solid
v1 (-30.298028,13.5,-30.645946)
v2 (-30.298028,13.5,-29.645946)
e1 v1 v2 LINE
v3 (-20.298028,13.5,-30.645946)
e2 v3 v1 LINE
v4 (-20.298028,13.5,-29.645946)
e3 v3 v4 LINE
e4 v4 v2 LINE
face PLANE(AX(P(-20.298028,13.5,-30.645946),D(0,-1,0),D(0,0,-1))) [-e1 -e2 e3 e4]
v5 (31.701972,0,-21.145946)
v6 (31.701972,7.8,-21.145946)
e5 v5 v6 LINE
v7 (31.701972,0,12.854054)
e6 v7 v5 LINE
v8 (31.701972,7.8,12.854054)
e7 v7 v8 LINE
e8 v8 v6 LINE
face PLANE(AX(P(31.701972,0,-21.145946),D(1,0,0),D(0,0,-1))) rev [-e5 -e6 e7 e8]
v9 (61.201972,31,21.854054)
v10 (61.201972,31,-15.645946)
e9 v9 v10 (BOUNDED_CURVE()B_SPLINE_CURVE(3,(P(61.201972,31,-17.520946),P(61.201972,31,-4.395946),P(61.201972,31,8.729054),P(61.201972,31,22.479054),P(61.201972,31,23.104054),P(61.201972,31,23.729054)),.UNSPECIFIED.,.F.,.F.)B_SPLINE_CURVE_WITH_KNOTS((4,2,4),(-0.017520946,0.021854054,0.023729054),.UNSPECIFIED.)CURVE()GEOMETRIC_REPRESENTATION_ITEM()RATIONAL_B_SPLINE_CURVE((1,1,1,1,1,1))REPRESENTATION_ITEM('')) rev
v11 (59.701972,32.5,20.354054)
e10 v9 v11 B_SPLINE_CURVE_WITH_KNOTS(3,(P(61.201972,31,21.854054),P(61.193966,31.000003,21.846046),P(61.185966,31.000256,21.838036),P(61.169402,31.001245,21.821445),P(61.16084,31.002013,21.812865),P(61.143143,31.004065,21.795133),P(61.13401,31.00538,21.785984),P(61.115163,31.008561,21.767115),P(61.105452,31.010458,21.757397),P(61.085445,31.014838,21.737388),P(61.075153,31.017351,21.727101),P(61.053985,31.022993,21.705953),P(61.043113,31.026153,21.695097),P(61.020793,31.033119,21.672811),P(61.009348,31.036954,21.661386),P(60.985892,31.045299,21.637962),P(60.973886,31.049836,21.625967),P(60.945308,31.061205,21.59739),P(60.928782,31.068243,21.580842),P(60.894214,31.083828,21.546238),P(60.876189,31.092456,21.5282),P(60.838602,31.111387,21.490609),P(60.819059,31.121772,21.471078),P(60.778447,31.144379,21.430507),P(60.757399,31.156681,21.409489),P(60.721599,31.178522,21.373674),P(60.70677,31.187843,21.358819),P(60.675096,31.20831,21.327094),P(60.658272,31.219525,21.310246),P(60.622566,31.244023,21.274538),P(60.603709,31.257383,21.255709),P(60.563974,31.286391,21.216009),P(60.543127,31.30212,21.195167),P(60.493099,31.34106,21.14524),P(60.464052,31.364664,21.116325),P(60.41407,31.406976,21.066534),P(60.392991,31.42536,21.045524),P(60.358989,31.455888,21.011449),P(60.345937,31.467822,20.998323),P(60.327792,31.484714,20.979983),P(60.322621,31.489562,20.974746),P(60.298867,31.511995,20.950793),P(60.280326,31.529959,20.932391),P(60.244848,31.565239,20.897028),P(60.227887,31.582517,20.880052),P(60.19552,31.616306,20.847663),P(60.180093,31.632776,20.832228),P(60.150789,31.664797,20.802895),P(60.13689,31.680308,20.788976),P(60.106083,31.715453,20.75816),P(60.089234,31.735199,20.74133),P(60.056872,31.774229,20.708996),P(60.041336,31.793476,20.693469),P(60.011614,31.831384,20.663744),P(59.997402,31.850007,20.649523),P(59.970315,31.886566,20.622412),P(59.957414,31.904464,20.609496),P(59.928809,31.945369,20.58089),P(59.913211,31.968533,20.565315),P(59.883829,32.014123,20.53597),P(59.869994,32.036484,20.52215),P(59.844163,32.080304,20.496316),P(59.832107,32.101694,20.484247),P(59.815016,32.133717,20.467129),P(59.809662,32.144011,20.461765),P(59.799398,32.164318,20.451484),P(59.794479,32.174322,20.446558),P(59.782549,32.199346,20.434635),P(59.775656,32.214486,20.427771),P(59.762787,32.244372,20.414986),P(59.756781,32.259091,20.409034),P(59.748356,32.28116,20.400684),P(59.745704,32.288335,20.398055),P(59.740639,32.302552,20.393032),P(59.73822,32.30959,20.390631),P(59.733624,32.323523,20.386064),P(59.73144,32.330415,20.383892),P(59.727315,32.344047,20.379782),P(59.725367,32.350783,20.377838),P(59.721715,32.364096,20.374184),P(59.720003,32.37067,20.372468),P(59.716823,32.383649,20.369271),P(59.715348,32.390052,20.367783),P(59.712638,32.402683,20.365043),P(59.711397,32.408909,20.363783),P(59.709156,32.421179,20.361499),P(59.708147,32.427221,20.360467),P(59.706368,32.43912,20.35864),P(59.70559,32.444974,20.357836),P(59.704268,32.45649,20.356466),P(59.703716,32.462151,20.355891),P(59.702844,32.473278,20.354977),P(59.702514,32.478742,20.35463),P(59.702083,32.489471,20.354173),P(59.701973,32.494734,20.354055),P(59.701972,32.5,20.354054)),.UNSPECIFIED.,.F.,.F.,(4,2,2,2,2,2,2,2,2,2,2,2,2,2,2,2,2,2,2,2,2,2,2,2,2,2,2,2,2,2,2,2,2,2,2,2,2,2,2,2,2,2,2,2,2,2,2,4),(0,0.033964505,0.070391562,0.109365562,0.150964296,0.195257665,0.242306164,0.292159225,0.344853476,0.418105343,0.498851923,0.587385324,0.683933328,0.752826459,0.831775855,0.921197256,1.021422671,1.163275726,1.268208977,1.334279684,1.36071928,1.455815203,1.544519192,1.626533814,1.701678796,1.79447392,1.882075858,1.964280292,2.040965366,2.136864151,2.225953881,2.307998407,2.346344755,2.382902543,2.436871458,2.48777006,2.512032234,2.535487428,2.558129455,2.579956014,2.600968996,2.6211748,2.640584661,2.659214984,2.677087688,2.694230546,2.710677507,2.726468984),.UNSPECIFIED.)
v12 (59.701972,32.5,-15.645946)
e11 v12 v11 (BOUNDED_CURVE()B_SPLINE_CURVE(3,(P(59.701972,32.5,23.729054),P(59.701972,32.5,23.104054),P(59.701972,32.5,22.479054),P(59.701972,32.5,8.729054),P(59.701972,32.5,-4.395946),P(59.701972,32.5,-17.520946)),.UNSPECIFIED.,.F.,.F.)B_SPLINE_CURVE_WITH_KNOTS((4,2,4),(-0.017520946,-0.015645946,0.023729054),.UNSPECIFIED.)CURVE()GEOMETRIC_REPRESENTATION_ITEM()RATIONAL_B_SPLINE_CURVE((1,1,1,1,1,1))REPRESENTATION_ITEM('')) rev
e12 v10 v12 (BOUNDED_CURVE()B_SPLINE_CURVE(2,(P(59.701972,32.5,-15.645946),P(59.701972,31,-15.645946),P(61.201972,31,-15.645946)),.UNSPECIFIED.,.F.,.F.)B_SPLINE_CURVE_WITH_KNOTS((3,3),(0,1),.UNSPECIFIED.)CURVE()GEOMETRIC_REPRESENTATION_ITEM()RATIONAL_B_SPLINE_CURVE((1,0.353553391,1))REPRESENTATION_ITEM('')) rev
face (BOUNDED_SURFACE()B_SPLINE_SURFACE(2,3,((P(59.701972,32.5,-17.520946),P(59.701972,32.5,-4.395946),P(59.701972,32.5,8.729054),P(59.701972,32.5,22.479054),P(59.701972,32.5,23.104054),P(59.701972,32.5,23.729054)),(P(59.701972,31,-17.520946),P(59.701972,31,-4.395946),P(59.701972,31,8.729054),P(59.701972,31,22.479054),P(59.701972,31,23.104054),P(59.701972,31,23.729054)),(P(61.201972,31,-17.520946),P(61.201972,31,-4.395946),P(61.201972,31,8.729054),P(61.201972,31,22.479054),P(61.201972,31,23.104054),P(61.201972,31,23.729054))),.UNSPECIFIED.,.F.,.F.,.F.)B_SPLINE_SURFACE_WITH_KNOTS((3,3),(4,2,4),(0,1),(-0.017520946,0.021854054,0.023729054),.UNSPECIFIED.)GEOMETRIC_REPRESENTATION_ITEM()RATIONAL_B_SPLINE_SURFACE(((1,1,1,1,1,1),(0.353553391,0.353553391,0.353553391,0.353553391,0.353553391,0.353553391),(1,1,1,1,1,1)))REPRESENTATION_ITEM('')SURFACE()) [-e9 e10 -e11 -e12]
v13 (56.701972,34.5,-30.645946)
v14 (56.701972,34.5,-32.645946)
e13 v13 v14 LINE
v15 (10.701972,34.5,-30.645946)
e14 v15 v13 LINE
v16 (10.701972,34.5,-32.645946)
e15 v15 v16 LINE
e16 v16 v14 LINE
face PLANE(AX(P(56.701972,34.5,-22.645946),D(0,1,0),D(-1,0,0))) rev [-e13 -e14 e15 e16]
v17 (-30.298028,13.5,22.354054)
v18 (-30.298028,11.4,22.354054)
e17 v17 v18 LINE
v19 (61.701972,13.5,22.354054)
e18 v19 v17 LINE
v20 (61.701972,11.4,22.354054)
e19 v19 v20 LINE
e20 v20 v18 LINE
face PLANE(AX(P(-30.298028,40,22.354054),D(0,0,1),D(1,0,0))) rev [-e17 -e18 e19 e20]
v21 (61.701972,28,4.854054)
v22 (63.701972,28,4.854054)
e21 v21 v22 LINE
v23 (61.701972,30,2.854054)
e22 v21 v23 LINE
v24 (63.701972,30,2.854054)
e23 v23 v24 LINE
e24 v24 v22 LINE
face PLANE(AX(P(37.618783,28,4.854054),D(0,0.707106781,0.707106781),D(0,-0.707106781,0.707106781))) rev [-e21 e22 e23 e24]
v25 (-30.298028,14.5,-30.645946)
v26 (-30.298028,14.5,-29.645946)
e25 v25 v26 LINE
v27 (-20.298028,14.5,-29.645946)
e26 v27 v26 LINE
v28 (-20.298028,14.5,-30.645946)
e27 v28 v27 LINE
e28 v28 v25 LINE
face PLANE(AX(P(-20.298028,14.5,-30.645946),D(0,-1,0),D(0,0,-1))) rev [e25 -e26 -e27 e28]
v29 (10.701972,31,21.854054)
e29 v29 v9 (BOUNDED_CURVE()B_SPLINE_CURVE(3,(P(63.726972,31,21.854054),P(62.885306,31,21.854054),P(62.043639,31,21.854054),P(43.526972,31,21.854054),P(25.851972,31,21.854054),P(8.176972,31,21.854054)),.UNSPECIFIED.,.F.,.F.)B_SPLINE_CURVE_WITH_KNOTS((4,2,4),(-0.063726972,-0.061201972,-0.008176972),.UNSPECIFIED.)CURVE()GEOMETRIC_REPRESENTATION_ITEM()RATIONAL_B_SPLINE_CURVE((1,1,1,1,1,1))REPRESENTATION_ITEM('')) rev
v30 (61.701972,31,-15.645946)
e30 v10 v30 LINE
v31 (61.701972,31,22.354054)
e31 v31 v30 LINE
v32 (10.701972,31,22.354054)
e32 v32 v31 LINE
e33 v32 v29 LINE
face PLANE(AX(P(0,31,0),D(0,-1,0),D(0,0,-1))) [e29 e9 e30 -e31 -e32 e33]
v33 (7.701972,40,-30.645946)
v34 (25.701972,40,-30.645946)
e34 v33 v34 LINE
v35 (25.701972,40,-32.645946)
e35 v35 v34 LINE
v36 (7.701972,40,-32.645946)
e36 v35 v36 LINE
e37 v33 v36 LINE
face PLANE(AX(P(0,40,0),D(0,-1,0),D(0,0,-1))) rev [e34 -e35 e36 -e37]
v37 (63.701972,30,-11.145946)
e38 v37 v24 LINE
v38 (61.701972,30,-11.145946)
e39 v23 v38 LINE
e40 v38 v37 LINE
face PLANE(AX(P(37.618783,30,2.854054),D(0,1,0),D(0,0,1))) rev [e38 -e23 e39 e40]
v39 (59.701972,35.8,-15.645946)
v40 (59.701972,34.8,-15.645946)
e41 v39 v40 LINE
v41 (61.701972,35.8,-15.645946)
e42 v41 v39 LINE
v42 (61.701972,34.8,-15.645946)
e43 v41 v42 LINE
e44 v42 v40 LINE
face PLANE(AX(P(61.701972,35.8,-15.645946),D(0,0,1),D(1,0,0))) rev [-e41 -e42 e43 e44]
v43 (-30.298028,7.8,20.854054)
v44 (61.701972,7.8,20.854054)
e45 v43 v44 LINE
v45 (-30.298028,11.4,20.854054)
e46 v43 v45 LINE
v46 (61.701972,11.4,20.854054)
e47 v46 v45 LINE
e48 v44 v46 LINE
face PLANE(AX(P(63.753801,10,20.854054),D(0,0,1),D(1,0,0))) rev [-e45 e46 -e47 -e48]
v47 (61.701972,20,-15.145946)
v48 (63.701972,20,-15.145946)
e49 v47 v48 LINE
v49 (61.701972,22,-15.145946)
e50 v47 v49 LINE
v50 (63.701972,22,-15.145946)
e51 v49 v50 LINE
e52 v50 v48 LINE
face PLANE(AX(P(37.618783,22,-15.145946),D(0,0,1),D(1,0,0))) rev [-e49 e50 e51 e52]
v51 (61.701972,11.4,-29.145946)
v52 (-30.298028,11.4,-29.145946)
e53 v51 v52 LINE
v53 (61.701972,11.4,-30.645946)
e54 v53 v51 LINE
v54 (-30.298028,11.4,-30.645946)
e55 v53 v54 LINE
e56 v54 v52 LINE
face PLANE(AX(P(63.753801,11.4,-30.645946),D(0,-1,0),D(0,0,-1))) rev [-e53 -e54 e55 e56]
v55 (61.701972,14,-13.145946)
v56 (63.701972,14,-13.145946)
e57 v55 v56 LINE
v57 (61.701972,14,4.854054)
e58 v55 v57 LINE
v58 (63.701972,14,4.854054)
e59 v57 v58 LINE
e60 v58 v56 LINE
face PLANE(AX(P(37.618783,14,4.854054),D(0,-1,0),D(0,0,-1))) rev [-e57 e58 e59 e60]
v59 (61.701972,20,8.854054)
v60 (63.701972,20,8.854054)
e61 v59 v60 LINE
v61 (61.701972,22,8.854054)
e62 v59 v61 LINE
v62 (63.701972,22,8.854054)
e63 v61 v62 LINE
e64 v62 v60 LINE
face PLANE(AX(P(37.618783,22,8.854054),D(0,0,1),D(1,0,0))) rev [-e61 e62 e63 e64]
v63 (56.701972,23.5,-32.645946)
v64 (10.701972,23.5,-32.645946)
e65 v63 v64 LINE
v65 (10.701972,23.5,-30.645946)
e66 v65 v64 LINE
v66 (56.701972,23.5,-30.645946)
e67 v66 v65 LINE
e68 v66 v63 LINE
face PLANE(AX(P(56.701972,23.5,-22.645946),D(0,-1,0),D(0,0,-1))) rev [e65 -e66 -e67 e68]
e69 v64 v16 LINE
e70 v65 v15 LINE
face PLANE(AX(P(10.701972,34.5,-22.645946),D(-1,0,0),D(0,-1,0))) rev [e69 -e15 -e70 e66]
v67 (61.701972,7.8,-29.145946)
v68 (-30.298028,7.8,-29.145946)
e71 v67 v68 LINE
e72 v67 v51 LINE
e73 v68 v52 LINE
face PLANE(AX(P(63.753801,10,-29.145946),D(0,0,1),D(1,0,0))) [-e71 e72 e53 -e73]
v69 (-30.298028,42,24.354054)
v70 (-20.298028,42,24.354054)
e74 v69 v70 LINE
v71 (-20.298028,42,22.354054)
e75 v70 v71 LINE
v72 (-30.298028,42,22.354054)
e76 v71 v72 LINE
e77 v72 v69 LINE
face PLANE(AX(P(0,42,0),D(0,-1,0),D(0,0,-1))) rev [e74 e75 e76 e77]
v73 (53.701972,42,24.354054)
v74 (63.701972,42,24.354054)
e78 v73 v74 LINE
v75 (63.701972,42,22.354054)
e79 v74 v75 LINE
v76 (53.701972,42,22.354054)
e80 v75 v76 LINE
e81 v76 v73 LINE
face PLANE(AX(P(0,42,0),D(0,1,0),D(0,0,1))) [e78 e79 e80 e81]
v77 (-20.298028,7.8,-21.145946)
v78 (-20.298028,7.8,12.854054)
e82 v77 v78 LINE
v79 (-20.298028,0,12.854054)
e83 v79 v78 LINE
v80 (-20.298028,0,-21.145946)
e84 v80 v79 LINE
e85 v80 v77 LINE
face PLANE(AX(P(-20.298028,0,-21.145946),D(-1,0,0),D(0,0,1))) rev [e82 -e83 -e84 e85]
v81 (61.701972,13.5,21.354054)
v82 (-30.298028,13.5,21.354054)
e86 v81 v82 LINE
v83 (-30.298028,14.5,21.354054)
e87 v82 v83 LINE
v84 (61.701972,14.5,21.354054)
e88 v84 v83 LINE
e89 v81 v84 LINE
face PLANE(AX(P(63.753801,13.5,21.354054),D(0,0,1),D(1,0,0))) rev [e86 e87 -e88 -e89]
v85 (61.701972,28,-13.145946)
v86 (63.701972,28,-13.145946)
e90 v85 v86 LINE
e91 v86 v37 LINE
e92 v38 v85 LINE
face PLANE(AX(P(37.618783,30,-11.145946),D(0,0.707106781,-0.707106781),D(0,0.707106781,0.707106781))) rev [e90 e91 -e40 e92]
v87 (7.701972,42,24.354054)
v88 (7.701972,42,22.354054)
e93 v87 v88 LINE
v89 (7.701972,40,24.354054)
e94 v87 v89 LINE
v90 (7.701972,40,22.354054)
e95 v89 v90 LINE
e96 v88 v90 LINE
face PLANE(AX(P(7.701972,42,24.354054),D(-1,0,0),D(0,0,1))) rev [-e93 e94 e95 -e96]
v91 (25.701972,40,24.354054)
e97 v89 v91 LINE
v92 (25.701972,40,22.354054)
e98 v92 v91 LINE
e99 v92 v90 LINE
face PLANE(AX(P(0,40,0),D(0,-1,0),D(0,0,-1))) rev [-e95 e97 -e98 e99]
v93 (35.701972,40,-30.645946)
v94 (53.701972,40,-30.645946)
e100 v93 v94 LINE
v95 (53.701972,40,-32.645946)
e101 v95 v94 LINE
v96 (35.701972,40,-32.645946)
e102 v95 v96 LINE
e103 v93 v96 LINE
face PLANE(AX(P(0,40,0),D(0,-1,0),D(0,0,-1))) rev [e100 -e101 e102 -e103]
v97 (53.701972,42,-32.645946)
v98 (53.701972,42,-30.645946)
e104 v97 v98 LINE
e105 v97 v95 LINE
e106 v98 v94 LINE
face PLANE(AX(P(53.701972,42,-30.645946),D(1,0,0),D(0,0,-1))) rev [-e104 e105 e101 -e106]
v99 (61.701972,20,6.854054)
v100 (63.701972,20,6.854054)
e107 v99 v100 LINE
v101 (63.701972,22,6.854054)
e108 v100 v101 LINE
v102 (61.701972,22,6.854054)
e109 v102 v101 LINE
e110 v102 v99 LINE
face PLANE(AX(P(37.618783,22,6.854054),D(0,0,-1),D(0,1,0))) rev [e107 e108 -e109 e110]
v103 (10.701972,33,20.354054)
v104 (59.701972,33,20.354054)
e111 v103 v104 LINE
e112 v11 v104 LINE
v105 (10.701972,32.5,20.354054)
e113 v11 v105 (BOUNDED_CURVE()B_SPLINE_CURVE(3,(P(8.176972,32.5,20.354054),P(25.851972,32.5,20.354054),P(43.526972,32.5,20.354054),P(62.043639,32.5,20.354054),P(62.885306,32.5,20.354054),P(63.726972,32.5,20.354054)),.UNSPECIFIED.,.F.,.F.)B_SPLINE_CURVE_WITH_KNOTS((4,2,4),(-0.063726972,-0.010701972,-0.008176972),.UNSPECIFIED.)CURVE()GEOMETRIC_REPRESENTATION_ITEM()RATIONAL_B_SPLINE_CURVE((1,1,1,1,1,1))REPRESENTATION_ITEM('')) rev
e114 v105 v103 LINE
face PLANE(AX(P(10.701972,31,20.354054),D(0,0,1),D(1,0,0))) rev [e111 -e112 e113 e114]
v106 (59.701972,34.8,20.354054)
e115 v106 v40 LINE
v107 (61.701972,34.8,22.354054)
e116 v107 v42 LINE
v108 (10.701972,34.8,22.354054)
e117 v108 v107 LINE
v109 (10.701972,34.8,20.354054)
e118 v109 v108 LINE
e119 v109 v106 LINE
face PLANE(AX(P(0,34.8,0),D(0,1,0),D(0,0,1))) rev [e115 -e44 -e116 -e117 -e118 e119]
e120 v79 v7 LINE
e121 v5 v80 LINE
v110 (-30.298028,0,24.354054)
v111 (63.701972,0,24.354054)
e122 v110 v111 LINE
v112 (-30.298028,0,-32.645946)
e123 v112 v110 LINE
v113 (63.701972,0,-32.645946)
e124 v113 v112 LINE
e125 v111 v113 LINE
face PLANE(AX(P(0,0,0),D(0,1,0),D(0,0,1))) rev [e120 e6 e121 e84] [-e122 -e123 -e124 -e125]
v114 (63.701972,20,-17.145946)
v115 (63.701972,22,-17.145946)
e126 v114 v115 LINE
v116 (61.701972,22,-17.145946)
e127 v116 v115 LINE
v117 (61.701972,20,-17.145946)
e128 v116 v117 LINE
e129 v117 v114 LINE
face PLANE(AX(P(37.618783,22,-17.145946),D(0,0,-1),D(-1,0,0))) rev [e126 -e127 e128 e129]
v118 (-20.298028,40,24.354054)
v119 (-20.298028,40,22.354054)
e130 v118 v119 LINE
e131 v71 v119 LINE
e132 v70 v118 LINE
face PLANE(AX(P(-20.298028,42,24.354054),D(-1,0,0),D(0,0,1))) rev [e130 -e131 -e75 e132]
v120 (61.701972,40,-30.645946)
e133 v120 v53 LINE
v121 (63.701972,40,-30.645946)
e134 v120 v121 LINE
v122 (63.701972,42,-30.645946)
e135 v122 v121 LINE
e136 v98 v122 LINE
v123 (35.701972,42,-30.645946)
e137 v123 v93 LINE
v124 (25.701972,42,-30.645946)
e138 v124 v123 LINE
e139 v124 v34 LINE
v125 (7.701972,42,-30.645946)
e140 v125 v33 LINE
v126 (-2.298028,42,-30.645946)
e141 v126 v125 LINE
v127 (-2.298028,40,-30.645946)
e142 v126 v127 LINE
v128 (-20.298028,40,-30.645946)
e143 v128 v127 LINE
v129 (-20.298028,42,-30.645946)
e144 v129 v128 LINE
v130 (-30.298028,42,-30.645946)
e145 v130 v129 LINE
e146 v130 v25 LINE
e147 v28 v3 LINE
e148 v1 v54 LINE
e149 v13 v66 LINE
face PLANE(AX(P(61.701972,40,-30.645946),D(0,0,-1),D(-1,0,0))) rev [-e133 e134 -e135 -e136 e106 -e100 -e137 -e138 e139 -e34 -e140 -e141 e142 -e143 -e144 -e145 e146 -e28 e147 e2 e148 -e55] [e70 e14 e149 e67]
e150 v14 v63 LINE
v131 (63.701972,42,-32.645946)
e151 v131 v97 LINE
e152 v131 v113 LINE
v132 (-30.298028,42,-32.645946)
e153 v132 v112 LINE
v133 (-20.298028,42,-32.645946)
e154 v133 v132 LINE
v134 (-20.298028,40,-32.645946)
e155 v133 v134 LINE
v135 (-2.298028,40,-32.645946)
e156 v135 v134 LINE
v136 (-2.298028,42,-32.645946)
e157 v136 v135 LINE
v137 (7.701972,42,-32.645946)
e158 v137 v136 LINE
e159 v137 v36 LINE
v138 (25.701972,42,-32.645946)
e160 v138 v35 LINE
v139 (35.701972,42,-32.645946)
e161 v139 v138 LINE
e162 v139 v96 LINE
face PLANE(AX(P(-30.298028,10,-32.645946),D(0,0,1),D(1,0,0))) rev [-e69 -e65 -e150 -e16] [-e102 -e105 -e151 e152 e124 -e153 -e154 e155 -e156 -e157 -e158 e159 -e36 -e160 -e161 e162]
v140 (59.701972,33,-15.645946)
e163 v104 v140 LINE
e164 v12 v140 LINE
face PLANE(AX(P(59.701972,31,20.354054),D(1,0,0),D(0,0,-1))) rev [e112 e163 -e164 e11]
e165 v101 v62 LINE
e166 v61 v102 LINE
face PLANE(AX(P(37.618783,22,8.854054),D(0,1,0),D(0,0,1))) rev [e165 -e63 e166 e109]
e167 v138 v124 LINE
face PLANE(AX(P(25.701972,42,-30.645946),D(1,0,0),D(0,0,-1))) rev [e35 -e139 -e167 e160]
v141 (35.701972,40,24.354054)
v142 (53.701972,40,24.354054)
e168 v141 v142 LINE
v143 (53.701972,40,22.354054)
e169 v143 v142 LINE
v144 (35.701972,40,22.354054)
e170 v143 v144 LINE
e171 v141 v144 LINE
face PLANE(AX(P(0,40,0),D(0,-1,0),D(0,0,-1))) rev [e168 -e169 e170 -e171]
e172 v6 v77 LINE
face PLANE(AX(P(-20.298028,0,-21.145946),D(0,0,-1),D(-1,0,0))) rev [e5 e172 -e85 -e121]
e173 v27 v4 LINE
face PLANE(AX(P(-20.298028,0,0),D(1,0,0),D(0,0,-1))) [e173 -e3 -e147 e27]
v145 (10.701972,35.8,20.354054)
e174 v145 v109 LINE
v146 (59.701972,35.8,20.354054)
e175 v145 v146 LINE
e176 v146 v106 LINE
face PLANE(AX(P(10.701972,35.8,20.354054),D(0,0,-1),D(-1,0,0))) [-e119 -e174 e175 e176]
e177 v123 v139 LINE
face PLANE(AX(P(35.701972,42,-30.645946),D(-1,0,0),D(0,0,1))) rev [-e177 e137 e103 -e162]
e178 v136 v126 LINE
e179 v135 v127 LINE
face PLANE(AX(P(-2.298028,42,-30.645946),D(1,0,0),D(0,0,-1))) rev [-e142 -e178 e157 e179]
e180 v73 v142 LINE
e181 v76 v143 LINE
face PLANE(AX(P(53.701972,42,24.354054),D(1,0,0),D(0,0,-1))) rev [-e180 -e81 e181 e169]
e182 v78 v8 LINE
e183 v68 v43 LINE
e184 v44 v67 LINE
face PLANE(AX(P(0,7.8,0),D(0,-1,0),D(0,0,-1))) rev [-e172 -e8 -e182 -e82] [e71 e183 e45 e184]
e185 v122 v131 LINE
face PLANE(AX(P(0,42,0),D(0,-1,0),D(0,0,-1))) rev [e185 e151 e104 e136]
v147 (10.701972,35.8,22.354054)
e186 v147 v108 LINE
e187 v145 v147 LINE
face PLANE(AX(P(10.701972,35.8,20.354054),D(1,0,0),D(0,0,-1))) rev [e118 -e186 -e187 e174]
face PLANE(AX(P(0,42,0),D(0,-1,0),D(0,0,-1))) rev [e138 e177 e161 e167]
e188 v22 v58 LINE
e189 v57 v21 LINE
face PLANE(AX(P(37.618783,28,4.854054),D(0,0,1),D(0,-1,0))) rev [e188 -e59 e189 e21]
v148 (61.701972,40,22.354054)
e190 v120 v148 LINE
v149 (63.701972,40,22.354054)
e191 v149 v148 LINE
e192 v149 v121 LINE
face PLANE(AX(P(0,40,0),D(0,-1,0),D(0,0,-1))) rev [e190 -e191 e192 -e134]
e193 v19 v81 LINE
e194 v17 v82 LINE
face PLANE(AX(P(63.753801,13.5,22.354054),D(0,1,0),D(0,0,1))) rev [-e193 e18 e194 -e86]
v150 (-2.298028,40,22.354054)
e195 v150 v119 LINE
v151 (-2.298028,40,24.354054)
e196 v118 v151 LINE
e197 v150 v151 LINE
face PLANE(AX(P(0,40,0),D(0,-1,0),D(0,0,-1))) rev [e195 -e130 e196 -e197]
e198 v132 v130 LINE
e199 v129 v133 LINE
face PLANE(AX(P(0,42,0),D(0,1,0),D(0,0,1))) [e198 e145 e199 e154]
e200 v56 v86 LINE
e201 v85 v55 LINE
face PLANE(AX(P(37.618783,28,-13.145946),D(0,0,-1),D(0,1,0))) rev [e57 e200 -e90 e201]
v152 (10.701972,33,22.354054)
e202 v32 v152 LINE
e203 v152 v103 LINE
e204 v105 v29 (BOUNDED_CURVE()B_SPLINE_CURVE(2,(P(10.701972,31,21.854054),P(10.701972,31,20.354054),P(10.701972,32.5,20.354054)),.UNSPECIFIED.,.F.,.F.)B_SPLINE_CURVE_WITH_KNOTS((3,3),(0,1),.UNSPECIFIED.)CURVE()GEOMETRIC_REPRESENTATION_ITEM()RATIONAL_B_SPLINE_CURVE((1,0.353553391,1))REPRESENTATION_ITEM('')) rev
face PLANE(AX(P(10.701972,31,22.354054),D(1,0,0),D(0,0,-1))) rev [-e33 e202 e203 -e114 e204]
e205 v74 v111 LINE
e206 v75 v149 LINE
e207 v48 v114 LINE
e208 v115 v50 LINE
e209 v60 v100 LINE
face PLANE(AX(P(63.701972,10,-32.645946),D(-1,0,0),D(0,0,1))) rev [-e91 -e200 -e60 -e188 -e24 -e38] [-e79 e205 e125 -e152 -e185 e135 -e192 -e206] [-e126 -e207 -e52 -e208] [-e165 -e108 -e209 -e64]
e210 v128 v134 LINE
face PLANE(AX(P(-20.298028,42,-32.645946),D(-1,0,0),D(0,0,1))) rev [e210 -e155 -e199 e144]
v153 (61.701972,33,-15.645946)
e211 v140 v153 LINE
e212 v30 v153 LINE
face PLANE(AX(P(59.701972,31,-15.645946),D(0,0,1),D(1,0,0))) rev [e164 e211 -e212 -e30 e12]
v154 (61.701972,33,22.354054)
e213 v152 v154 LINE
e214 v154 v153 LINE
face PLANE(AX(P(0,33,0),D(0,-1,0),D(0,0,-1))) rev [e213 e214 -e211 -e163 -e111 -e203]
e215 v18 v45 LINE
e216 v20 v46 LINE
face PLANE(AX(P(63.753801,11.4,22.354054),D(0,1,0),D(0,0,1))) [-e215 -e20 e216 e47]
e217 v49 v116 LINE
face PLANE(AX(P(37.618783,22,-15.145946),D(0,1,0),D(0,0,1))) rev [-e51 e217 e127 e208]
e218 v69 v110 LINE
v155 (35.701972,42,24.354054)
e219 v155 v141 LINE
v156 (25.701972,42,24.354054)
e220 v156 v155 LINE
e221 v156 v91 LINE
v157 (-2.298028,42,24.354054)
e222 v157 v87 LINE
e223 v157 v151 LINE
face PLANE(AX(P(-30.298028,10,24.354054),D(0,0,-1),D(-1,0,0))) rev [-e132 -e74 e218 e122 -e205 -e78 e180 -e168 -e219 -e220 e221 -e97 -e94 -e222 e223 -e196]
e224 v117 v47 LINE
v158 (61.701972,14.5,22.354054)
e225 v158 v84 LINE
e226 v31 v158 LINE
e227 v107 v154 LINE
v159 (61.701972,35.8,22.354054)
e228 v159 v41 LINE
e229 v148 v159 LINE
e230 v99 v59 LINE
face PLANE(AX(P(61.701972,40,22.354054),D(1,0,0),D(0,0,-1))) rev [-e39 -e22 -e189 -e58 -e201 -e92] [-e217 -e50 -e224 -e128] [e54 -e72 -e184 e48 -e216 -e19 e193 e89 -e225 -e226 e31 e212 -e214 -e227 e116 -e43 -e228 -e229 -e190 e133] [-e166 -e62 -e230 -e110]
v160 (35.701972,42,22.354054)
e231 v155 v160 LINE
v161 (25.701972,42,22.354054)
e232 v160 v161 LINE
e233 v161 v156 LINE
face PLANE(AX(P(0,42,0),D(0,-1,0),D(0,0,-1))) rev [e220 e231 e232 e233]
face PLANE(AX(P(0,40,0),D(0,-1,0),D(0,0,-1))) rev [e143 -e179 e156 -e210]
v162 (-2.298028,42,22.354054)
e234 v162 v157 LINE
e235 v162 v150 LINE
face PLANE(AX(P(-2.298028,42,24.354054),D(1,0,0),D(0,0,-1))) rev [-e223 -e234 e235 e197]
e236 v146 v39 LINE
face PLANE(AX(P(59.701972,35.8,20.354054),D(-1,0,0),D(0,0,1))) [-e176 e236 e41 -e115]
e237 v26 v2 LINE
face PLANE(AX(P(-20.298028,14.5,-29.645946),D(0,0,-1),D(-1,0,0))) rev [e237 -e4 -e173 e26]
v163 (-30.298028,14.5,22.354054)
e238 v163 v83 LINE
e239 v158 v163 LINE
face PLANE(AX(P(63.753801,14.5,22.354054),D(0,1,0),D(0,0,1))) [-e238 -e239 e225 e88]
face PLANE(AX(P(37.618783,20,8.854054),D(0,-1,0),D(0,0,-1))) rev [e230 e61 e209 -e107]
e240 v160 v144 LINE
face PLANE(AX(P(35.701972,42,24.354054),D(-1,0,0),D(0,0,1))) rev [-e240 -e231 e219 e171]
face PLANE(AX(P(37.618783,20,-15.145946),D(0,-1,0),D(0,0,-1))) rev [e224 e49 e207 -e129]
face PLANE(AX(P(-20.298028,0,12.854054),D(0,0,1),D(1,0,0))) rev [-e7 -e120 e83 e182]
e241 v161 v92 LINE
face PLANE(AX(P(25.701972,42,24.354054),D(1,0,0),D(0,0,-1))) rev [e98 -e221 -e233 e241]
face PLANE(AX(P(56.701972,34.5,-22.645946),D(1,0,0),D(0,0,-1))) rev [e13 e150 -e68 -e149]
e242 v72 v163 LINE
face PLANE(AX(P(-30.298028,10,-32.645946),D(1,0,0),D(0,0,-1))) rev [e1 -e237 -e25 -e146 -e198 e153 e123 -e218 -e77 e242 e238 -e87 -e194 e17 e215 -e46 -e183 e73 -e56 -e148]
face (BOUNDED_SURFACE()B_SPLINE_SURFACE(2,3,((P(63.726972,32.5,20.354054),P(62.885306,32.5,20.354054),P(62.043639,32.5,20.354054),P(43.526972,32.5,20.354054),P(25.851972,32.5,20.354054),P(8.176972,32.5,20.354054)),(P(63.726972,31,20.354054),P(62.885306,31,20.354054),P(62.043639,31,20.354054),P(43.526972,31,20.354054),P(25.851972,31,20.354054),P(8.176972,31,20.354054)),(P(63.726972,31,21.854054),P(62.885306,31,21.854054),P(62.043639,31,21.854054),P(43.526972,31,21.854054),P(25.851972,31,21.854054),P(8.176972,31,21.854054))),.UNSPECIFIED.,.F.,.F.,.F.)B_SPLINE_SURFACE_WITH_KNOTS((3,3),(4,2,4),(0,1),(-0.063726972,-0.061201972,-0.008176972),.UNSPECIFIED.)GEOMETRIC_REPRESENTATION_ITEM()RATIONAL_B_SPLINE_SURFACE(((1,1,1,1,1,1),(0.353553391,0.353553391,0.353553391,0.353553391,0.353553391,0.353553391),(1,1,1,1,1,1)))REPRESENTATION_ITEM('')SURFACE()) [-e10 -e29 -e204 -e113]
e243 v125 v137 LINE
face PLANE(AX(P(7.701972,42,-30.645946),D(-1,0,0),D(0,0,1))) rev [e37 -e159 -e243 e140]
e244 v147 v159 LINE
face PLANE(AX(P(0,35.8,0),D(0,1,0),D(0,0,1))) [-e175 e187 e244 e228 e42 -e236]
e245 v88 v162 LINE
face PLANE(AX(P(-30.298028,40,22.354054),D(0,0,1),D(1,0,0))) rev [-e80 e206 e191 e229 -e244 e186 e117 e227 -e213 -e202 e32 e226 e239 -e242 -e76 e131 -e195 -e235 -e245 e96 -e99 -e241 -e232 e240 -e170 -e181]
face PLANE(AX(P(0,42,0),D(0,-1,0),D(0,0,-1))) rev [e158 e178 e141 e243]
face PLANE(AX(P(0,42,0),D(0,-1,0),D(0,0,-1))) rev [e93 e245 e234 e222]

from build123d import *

# Parameters (mm, degrees)
SKETCH1_W               = 94
SKETCH1_H               = 57
BOSS_EXTRUDE1_DEPTH     = 10
BOSS_EXTRUDE2_DEPTH     = 30
SKETCH3_W               = 1.5
SKETCH3_H               = 1.4
SKETCH3_W_2             = 1
SKETCH3_H_2             = 1
BOSS_EXTRUDE3_DEPTH     = 92
SKETCH3_3_W             = 1
SKETCH3_3_H             = 1
BOSS_EXTRUDE4_DEPTH     = 10
SKETCH4_W               = 46
SKETCH4_H               = 11
CUT_EXTRUDE1_DEPTH      = 10
SKETCH5_W               = 2
SKETCH5_H               = 2
CUT_EXTRUDE2_DEPTH      = 2
BOSS_EXTRUDE5_DEPTH     = 2
FILLET1_SIZE            = 1.5
BOSS_EXTRUDE6_DEPTH     = 1
SKETCH9_W               = 10
SKETCH9_H               = 2
BOSS_EXTRUDE7_DEPTH     = 2
CUT_EXTRUDE3_DEPTH      = 79.407264077
CUT_EXTRUDE3_DEPTH_BACK = 79.407264077
SKETCH10_W              = 52
SKETCH10_H              = 34
SKETCH11_W              = 92
SKETCH11_H              = 50
CUT_EXTRUDE4_DEPTH      = 2.2


with BuildPart() as part:
    # Sketch1 → Boss-Extrude1 (new body)
    with BuildSketch(Plane(origin=(0, 0, 0), x_dir=(1, 0, 0), z_dir=(0, 1, 0))):
        with Locations((16.701972288, 4.145945946)):
            Rectangle(SKETCH1_W, SKETCH1_H)
    extrude(amount=BOSS_EXTRUDE1_DEPTH)

    # Sketch2 → Boss-Extrude2 (add)
    with BuildSketch(Plane(origin=(0, 10, 0), x_dir=(1, 0, 0), z_dir=(0, 1, 0))):
        Polygon((-30.298027712, 32.645945946), (63.701972288, 32.645945946), (63.701972288, -24.354054054), (-30.298027712, -24.354054054), (-30.298027712, -22.354054054), (61.701972288, -22.354054054), (61.701972288, 30.645945946), (-30.298027712, 30.645945946), align=None)
    extrude(amount=BOSS_EXTRUDE2_DEPTH)

    # Sketch3 → Boss-Extrude3 (add)
    with BuildSketch(Plane.ZY.offset(30.298027712)):
        with Locations((-29.895945946, 10.7)):
            Rectangle(SKETCH3_W, SKETCH3_H)
        with Locations((21.604054054, 10.7)):
            Rectangle(SKETCH3_W, SKETCH3_H)
        with Locations((21.854054054, 14)):
            Rectangle(SKETCH3_W_2, SKETCH3_H_2)
    extrude(amount=-BOSS_EXTRUDE3_DEPTH)

    # Sketch3<3> → Boss-Extrude4 (add)
    with BuildSketch(Plane.ZY.offset(30.298027712)):
        with Locations((-30.145945946, 14)):
            Rectangle(SKETCH3_3_W, SKETCH3_3_H)
    extrude(amount=-BOSS_EXTRUDE4_DEPTH)

    # Sketch4 → Cut-Extrude1 (cut)
    with BuildSketch(Plane(origin=(0, 0, -32.645945946), x_dir=(-1, 0, 0), z_dir=(0, 0, -1))):
        with Locations((-33.701972288, 29)):
            Rectangle(SKETCH4_W, SKETCH4_H)
    extrude(amount=-CUT_EXTRUDE1_DEPTH, mode=Mode.SUBTRACT)

    # Sketch5 → Cut-Extrude2 (cut)
    with BuildSketch(Plane(origin=(63.701972288, 0, 0), x_dir=(0, 0, -1), z_dir=(1, 0, 0))):
        Polygon((-2.854054054, 30), (11.145945946, 30), (13.145945946, 28), (13.145945946, 14), (-4.854054054, 14), (-4.854054054, 28), align=None)
        with Locations((-7.854054054, 21)):
            Rectangle(SKETCH5_W, SKETCH5_H)
        with Locations((16.145945946, 21)):
            Rectangle(SKETCH5_W, SKETCH5_H)
    extrude(amount=-CUT_EXTRUDE2_DEPTH, mode=Mode.SUBTRACT)

    # Sketch7 → Boss-Extrude5 (add)
    with BuildSketch(Plane(origin=(0, 33, 0), x_dir=(1, 0, 0), z_dir=(0, 1, 0))):
        Polygon((10.701972288, -22.354054054), (61.701972288, -22.354054054), (61.701972288, -20.354054054), (61.701972288, 15.645945946), (59.701972288, 15.645945946), (59.701972288, -20.354054054), (10.701972288, -20.354054054), align=None)
    extrude(amount=-BOSS_EXTRUDE5_DEPTH)

    # Fillet1
    # a fillet whose section is not a circle: 1.5 mm, written as the material it takes off along each edge
    with BuildSketch(Plane(origin=(59.701972288, 31, -19.395945946), x_dir=(1, 0, 0), z_dir=(0, 0, 1))) as fillet1_piece_1:
        with BuildLine():
            Bezier((FILLET1_SIZE, 0), (0, 0), (0, FILLET1_SIZE), weights=[1, 0.353553391, 1])
            Line((0, FILLET1_SIZE), (0, 0))
            Line((0, 0), (FILLET1_SIZE, 0))
        make_face()
    extrude(amount=39.75, mode=Mode.SUBTRACT)
    with BuildSketch(Plane(origin=(59.701972288, 31, 20.354054054), x_dir=(0, 0, 1), z_dir=(-1, 0, 0))) as fillet1_piece_2:
        with BuildLine():
            Bezier((FILLET1_SIZE, 0), (0, 0), (0, FILLET1_SIZE), weights=[1, 0.353553391, 1])
            Line((0, FILLET1_SIZE), (0, 0))
            Line((0, 0), (FILLET1_SIZE, 0))
        make_face()
    extrude(amount=52.75, mode=Mode.SUBTRACT)
    with BuildSketch(Plane(origin=(59.701972288, 31, -19.395945946), x_dir=(1, 0, 0), z_dir=(0, 0, 1))) as fillet1_piece_3a_section:
        with BuildLine():
            Bezier((FILLET1_SIZE, 0), (0, 0), (0, FILLET1_SIZE), weights=[1, 0.353553391, 1])
            Line((0, FILLET1_SIZE), (0, 0))
            Line((0, 0), (FILLET1_SIZE, 0))
        make_face()
    fillet1_piece_3a = extrude(amount=43.5, mode=Mode.PRIVATE)
    fillet1_piece_3a = split(fillet1_piece_3a, bisect_by=Plane(origin=(59.701972288, 31, 22.354054054), z_dir=(0, 0, -1)), keep=Keep.TOP, mode=Mode.PRIVATE)
    fillet1_piece_3a = split(fillet1_piece_3a, bisect_by=Plane(origin=(59.701972288, 31, 20.354054054), z_dir=(0, 0, 1)), keep=Keep.TOP, mode=Mode.PRIVATE)
    with BuildSketch(Plane(origin=(63.451972288, 31, 20.354054054), x_dir=(0, 0, 1), z_dir=(-1, 0, 0))) as fillet1_piece_3b_section:
        with BuildLine():
            Bezier((FILLET1_SIZE, 0), (0, 0), (0, FILLET1_SIZE), weights=[1, 0.353553391, 1])
            Line((0, FILLET1_SIZE), (0, 0))
            Line((0, 0), (FILLET1_SIZE, 0))
        make_face()
    fillet1_piece_3b = extrude(amount=56.5, mode=Mode.PRIVATE)
    fillet1_piece_3b = split(fillet1_piece_3b, bisect_by=Plane(origin=(61.701972288, 31, 20.354054054), z_dir=(-1, 0, 0)), keep=Keep.TOP, mode=Mode.PRIVATE)
    fillet1_piece_3b = split(fillet1_piece_3b, bisect_by=Plane(origin=(59.701972288, 31, 20.354054054), z_dir=(1, 0, 0)), keep=Keep.TOP, mode=Mode.PRIVATE)
    fillet1_piece_3 = fillet1_piece_3a & fillet1_piece_3b
    add(fillet1_piece_3, mode=Mode.SUBTRACT)

    # Sketch8 → Boss-Extrude6 (add)
    with BuildSketch(Plane(origin=(0, 34.8, 0), x_dir=(1, 0, 0), z_dir=(0, 1, 0))):
        Polygon((10.701972288, -20.354054054), (59.701972288, -20.354054054), (59.701972288, 15.645945946), (61.701972288, 15.645945946), (61.701972288, -22.354054054), (10.701972288, -22.354054054), align=None)
    extrude(amount=BOSS_EXTRUDE6_DEPTH)

    # Sketch9 → Boss-Extrude7 (add)
    with BuildSketch(Plane(origin=(0, 40, 0), x_dir=(1, 0, 0), z_dir=(0, 1, 0))):
        with Locations((-25.298027712, 31.645945946)):
            Rectangle(SKETCH9_W, SKETCH9_H)
        with Locations((2.701972288, 31.645945946)):
            Rectangle(SKETCH9_W, SKETCH9_H)
        with Locations((30.701972288, 31.645945946)):
            Rectangle(SKETCH9_W, SKETCH9_H)
        with Locations((58.701972288, 31.645945946)):
            Rectangle(SKETCH9_W, SKETCH9_H)
        with Locations((-25.298027712, -23.354054054)):
            Rectangle(SKETCH9_W, SKETCH9_H)
        with Locations((2.701972288, -23.354054054)):
            Rectangle(SKETCH9_W, SKETCH9_H)
        with Locations((30.701972288, -23.354054054)):
            Rectangle(SKETCH9_W, SKETCH9_H)
        with Locations((58.701972288, -23.354054054)):
            Rectangle(SKETCH9_W, SKETCH9_H)
    extrude(amount=BOSS_EXTRUDE7_DEPTH)

    # Sketch10 → Cut-Extrude3 (cut, two sides: drawn at the far end of the back side and taken through both)
    with BuildSketch(Plane(origin=(0, 10, 0), x_dir=(1, 0, 0), z_dir=(0, 1, 0)).offset(-CUT_EXTRUDE3_DEPTH_BACK)):
        with Locations((5.701972288, 4.145945946)):
            Rectangle(SKETCH10_W, SKETCH10_H)
    extrude(amount=CUT_EXTRUDE3_DEPTH + CUT_EXTRUDE3_DEPTH_BACK, mode=Mode.SUBTRACT)

    # Sketch11 → Cut-Extrude4 (cut)
    with BuildSketch(Plane(origin=(0, 10, 0), x_dir=(1, 0, 0), z_dir=(0, 1, 0))):
        with Locations((15.701972288, 4.145945946)):
            Rectangle(SKETCH11_W, SKETCH11_H)
    extrude(amount=-CUT_EXTRUDE4_DEPTH, mode=Mode.SUBTRACT)


solid = part.part
